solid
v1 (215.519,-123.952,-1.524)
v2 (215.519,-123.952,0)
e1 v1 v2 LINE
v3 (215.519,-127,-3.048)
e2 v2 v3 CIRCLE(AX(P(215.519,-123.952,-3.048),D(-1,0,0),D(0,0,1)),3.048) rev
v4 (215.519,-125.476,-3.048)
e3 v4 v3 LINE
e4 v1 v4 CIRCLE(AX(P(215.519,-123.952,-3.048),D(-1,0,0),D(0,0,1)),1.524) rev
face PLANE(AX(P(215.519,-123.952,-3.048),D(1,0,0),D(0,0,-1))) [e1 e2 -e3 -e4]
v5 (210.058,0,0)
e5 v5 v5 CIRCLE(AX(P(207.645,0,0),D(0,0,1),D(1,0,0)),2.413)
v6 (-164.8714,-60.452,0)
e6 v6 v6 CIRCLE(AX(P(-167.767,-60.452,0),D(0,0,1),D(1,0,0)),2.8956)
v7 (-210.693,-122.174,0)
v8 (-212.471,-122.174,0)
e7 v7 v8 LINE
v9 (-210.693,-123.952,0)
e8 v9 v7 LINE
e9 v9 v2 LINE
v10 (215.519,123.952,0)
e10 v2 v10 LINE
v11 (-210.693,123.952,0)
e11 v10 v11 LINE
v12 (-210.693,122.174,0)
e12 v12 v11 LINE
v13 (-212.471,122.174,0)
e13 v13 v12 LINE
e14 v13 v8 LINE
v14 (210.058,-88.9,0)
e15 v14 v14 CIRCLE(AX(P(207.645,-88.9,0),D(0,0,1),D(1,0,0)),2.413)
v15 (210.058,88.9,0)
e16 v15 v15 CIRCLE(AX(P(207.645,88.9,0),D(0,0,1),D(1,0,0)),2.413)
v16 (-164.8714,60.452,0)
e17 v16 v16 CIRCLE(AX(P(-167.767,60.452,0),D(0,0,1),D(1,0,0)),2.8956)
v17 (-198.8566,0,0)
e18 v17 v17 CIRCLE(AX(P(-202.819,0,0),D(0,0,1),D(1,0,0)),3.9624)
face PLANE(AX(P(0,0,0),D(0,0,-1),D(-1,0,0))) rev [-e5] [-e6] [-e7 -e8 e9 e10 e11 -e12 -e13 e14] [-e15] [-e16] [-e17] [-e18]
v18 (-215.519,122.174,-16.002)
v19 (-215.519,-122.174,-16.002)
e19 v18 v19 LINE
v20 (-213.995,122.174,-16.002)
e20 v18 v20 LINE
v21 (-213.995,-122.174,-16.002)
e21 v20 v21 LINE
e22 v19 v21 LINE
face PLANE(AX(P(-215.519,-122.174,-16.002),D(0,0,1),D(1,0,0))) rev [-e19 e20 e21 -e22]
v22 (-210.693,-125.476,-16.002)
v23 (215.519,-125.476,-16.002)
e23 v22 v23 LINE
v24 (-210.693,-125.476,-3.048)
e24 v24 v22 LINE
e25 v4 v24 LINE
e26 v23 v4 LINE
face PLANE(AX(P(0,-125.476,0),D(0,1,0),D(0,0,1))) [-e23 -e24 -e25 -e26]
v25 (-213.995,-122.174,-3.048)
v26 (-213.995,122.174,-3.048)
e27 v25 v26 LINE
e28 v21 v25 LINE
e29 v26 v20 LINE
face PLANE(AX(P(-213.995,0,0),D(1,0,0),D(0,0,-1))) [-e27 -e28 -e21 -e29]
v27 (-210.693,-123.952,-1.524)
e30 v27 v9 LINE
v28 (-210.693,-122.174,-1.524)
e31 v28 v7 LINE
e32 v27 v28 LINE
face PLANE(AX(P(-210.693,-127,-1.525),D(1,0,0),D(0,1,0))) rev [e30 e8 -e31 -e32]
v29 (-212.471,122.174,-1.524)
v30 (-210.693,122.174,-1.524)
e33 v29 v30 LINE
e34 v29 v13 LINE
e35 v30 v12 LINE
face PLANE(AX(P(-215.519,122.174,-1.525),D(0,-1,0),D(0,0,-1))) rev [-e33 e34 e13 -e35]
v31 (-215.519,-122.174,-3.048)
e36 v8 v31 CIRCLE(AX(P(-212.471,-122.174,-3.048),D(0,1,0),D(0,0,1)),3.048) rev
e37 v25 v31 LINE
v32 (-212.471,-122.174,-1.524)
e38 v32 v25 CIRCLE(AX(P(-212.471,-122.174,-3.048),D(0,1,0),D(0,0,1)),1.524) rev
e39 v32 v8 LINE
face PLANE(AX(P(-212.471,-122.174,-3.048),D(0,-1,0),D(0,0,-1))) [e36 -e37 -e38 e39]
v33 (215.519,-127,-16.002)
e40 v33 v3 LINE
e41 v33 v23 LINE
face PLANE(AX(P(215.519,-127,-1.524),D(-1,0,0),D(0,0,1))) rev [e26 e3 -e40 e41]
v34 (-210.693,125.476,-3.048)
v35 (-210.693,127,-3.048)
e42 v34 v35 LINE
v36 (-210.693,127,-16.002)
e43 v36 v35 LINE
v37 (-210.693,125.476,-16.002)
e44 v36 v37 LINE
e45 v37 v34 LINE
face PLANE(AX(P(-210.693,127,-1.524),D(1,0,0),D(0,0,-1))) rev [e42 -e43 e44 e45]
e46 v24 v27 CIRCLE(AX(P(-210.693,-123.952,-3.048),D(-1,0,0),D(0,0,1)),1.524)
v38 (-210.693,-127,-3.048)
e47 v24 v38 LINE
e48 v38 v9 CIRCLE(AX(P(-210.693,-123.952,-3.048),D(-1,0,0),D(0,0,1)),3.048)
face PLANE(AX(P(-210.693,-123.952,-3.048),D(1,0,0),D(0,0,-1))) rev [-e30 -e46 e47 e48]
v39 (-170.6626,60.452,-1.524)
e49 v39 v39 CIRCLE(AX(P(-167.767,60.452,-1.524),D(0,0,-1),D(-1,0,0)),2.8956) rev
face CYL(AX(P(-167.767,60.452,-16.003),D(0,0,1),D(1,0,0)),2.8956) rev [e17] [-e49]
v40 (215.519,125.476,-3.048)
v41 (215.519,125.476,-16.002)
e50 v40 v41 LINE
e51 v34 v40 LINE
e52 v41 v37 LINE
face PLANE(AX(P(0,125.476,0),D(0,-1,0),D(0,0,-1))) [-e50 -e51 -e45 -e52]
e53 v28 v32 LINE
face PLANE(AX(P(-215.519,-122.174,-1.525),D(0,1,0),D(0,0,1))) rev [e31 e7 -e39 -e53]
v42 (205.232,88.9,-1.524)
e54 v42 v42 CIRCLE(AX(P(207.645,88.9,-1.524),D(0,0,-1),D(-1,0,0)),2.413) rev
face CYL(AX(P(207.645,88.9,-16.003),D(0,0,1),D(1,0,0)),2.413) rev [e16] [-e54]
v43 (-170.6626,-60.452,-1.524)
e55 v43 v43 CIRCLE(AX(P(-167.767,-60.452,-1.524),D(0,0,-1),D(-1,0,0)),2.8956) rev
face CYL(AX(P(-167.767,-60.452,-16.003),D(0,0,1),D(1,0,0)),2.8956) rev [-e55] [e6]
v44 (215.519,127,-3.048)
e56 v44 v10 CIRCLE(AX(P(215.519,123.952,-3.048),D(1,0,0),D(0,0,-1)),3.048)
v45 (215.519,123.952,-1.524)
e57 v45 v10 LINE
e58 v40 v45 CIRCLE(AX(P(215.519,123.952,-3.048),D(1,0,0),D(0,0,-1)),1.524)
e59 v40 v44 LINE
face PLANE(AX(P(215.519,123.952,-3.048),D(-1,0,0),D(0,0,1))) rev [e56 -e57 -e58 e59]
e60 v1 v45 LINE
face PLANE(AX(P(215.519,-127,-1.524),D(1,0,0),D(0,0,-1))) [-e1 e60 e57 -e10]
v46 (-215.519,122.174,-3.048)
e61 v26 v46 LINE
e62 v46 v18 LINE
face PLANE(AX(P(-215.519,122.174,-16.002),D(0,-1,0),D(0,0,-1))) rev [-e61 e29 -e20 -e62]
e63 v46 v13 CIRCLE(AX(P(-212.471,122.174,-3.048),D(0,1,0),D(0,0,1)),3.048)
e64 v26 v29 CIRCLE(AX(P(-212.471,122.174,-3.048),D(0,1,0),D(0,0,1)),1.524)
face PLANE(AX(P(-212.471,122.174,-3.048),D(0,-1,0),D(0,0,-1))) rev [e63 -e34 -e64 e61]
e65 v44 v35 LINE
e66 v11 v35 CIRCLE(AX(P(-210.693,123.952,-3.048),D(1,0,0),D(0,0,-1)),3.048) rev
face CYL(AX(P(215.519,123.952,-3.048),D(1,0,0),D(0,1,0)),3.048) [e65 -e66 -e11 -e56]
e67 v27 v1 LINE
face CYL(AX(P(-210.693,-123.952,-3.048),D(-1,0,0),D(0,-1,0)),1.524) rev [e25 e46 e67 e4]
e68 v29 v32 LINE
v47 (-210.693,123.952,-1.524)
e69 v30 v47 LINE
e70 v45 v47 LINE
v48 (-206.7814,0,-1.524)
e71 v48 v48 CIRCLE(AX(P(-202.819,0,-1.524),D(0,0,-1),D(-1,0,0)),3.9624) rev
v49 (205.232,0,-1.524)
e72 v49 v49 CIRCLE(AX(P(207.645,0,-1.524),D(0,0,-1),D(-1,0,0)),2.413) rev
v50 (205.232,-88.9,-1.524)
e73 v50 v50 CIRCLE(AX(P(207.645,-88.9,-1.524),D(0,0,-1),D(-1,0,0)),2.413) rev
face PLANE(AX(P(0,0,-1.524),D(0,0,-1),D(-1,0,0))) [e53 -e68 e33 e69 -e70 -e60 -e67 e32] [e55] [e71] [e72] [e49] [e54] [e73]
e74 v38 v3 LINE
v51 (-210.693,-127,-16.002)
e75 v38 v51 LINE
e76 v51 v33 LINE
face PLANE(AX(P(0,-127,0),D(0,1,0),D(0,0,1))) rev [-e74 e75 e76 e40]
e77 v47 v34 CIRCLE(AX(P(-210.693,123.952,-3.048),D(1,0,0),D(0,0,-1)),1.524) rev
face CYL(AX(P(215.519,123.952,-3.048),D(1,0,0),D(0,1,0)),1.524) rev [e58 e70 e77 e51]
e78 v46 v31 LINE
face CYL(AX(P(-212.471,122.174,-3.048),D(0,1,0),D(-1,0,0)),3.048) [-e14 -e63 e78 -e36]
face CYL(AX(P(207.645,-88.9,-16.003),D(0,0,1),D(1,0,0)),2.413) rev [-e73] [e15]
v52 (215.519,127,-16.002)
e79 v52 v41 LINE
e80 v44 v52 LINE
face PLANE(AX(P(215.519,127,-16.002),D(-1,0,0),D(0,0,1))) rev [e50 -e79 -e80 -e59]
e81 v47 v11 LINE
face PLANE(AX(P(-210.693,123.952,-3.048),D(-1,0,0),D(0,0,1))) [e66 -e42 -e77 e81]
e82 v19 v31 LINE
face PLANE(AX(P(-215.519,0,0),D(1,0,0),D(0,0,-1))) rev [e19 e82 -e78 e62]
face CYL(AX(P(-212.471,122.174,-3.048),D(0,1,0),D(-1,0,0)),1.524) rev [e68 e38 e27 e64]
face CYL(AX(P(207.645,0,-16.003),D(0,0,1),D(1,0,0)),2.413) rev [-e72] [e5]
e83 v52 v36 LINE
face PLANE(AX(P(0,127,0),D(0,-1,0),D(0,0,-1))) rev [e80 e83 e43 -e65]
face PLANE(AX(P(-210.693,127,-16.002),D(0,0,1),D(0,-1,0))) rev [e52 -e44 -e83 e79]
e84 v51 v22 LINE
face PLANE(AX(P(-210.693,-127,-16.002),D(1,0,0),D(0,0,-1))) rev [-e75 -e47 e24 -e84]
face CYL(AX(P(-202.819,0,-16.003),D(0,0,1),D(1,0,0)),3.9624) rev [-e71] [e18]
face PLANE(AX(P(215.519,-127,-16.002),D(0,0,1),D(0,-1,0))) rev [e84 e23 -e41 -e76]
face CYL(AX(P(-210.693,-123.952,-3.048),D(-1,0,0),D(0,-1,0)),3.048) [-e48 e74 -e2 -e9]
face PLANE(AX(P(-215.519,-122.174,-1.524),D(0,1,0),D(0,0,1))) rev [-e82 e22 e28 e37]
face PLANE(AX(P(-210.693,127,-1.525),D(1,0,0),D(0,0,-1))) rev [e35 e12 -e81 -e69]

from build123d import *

# Parameters (mm, degrees)
CROQUIS1_W                         = 431.038
CROQUIS1_H                         = 254
BRIDA_BASE1_DEPTH                  = 1.524
CORTAR_EXTRUIR1_REACH              = 252.159
CROQUIS6_W                         = 4.826
CROQUIS6_H                         = 4.826
BRIDA_DE_ARISTA1_STRIP_W           = 9.144
BRIDA_DE_ARISTA1_STRIP_H           = 1.524
BRIDA_DE_ARISTA1_STRIP_CUT_DEPTH   = 426.212
BRIDA_DE_ARISTA1_STRIP_2_W         = 9.144
BRIDA_DE_ARISTA1_STRIP_2_H         = 1.524
BRIDA_DE_ARISTA1_STRIP_CUT_2_DEPTH = 426.212
BRIDA_DE_ARISTA1_STRIP_3_W         = 9.144
BRIDA_DE_ARISTA1_STRIP_3_H         = 1.524
BRIDA_DE_ARISTA1_STRIP_CUT_3_DEPTH = 244.348
BRIDA_DE_ARISTA1_DEPTH             = 426.212
BRIDA_DE_ARISTA1_BEND_DEPTH        = 426.212
BRIDA_DE_ARISTA1_BEND_2_DEPTH      = 244.348
CORTAR_EXTRUIR2_REACH              = 252.666
CROQUIS16_R                        = 3.9624
CROQUIS16_R_2                      = 2.8956
CROQUIS16_R_3                      = 2.413


# Sheet-metal steps are written as plain solids
with BuildPart() as part:
    # Croquis1 → Brida base1 (new body)
    with BuildSketch(Plane.XY):
        Rectangle(CROQUIS1_W, CROQUIS1_H)
    extrude(amount=-BRIDA_BASE1_DEPTH)

    # Croquis6 → Cortar-Extruir1 (cut, up to next)
    with BuildSketch(Plane.XY, mode=Mode.PRIVATE) as cortar_extruir1_sk1:
        with Locations((-213.106, 124.587)):
            Rectangle(CROQUIS6_W, CROQUIS6_H)
    cortar_extruir1_tool1 = extrude(cortar_extruir1_sk1.sketch, amount=-CORTAR_EXTRUIR1_REACH, mode=Mode.PRIVATE) & part.part
    # Croquis6 → Cortar-Extruir1 (cut, up to next)
    with BuildSketch(Plane.XY, mode=Mode.PRIVATE) as cortar_extruir1_sk2:
        with Locations((-213.106, -124.587)):
            Rectangle(CROQUIS6_W, CROQUIS6_H)
    cortar_extruir1_tool2 = extrude(cortar_extruir1_sk2.sketch, amount=-CORTAR_EXTRUIR1_REACH, mode=Mode.PRIVATE) & part.part
    add(cortar_extruir1_tool1.solids().sort_by_distance((-213.106, 124.587, 0))[0], mode=Mode.SUBTRACT)
    add(cortar_extruir1_tool2.solids().sort_by_distance((-213.106, -124.587, 0))[0], mode=Mode.SUBTRACT)

    # Brida de arista1 strip (across the edge) → Brida de arista1 strip cut (cut)
    with BuildSketch(Plane(origin=(-210.693, 127, -1.524), x_dir=(0, -1, 0), z_dir=(1, 0, 0))):
        with Locations((-1.524, -0.762)):
            Rectangle(BRIDA_DE_ARISTA1_STRIP_W, BRIDA_DE_ARISTA1_STRIP_H)
    extrude(amount=BRIDA_DE_ARISTA1_STRIP_CUT_DEPTH, mode=Mode.SUBTRACT)

    # Brida de arista1 strip 2 (across the edge) → Brida de arista1 strip cut 2 (cut)
    with BuildSketch(Plane(origin=(215.519, -127, -1.524), x_dir=(0, 1, 0), z_dir=(-1, 0, 0))):
        with Locations((-1.524, -0.762)):
            Rectangle(BRIDA_DE_ARISTA1_STRIP_2_W, BRIDA_DE_ARISTA1_STRIP_2_H)
    extrude(amount=BRIDA_DE_ARISTA1_STRIP_CUT_2_DEPTH, mode=Mode.SUBTRACT)

    # Brida de arista1 strip 3 (across the edge) → Brida de arista1 strip cut 3 (cut)
    with BuildSketch(Plane(origin=(-215.519, -122.174, -1.524), x_dir=(1, 0, 0), z_dir=(0, 1, 0))):
        with Locations((-1.524, -0.762)):
            Rectangle(BRIDA_DE_ARISTA1_STRIP_3_W, BRIDA_DE_ARISTA1_STRIP_3_H)
    extrude(amount=BRIDA_DE_ARISTA1_STRIP_CUT_3_DEPTH, mode=Mode.SUBTRACT)

    # Brida de arista1 section (across the edge) → Brida de arista1 (add)
    with BuildSketch(Plane(origin=(-210.693, 127, -1.524), x_dir=(0, -1, 0), z_dir=(1, 0, 0))):
        with BuildLine():
            Line((0, 1.524), (0, 14.478))
            Line((0, 14.478), (1.524, 14.478))
            Line((1.524, 14.478), (1.524, 1.524))
            ThreePointArc((1.524, 1.524), (1.970369265, 0.446369265), (3.048, 0))
            Line((3.048, 0), (3.048, -1.524))
            ThreePointArc((3.048, -1.524), (0.892738531, -0.631261469), (0, 1.524))
        make_face()
    extrude(amount=BRIDA_DE_ARISTA1_DEPTH)

    # Brida de arista1 section 2 (across the edge) → Brida de arista1 bend (add)
    with BuildSketch(Plane(origin=(215.519, -127, -1.524), x_dir=(0, 1, 0), z_dir=(-1, 0, 0))):
        with BuildLine():
            Line((0, 1.524), (0, 14.478))
            Line((0, 14.478), (1.524, 14.478))
            Line((1.524, 14.478), (1.524, 1.524))
            ThreePointArc((1.524, 1.524), (1.970369265, 0.446369265), (3.048, 0))
            Line((3.048, 0), (3.048, -1.524))
            ThreePointArc((3.048, -1.524), (0.892738531, -0.631261469), (0, 1.524))
        make_face()
    extrude(amount=BRIDA_DE_ARISTA1_BEND_DEPTH)

    # Brida de arista1 section 3 (across the edge) → Brida de arista1 bend 2 (add)
    with BuildSketch(Plane(origin=(-215.519, -122.174, -1.524), x_dir=(1, 0, 0), z_dir=(0, 1, 0))):
        with BuildLine():
            Line((0, 1.524), (0, 14.478))
            Line((0, 14.478), (1.524, 14.478))
            Line((1.524, 14.478), (1.524, 1.524))
            ThreePointArc((1.524, 1.524), (1.970369265, 0.446369265), (3.048, 0))
            Line((3.048, 0), (3.048, -1.524))
            ThreePointArc((3.048, -1.524), (0.892738531, -0.631261469), (0, 1.524))
        make_face()
    extrude(amount=BRIDA_DE_ARISTA1_BEND_2_DEPTH)

    # Croquis16 → Cortar-Extruir2 (cut, up to next)
    with BuildSketch(Plane.XY, mode=Mode.PRIVATE) as cortar_extruir2_sk1:
        with Locations((-202.819, 0)):
            Circle(CROQUIS16_R)
    cortar_extruir2_tool1 = extrude(cortar_extruir2_sk1.sketch, amount=-CORTAR_EXTRUIR2_REACH, mode=Mode.PRIVATE) & part.part
    # Croquis16 → Cortar-Extruir2 (cut, up to next)
    with BuildSketch(Plane.XY, mode=Mode.PRIVATE) as cortar_extruir2_sk2:
        with Locations((-167.767, 60.452)):
            Circle(CROQUIS16_R_2)
    cortar_extruir2_tool2 = extrude(cortar_extruir2_sk2.sketch, amount=-CORTAR_EXTRUIR2_REACH, mode=Mode.PRIVATE) & part.part
    # Croquis16 → Cortar-Extruir2 (cut, up to next)
    with BuildSketch(Plane.XY, mode=Mode.PRIVATE) as cortar_extruir2_sk3:
        with Locations((-167.767, -60.452)):
            Circle(CROQUIS16_R_2)
    cortar_extruir2_tool3 = extrude(cortar_extruir2_sk3.sketch, amount=-CORTAR_EXTRUIR2_REACH, mode=Mode.PRIVATE) & part.part
    # Croquis16 → Cortar-Extruir2 (cut, up to next)
    with BuildSketch(Plane.XY, mode=Mode.PRIVATE) as cortar_extruir2_sk4:
        with Locations((207.645, 88.9)):
            Circle(CROQUIS16_R_3)
    cortar_extruir2_tool4 = extrude(cortar_extruir2_sk4.sketch, amount=-CORTAR_EXTRUIR2_REACH, mode=Mode.PRIVATE) & part.part
    # Croquis16 → Cortar-Extruir2 (cut, up to next)
    with BuildSketch(Plane.XY, mode=Mode.PRIVATE) as cortar_extruir2_sk5:
        with Locations((207.645, 0)):
            Circle(CROQUIS16_R_3)
    cortar_extruir2_tool5 = extrude(cortar_extruir2_sk5.sketch, amount=-CORTAR_EXTRUIR2_REACH, mode=Mode.PRIVATE) & part.part
    # Croquis16 → Cortar-Extruir2 (cut, up to next)
    with BuildSketch(Plane.XY, mode=Mode.PRIVATE) as cortar_extruir2_sk6:
        with Locations((207.645, -88.9)):
            Circle(CROQUIS16_R_3)
    cortar_extruir2_tool6 = extrude(cortar_extruir2_sk6.sketch, amount=-CORTAR_EXTRUIR2_REACH, mode=Mode.PRIVATE) & part.part
    add(cortar_extruir2_tool1.solids().sort_by_distance((-202.819, 0, 0))[0], mode=Mode.SUBTRACT)
    add(cortar_extruir2_tool2.solids().sort_by_distance((-167.767, 60.452, 0))[0], mode=Mode.SUBTRACT)
    add(cortar_extruir2_tool3.solids().sort_by_distance((-167.767, -60.452, 0))[0], mode=Mode.SUBTRACT)
    add(cortar_extruir2_tool4.solids().sort_by_distance((207.645, 88.9, 0))[0], mode=Mode.SUBTRACT)
    add(cortar_extruir2_tool5.solids().sort_by_distance((207.645, 0, 0))[0], mode=Mode.SUBTRACT)
    add(cortar_extruir2_tool6.solids().sort_by_distance((207.645, -88.9, 0))[0], mode=Mode.SUBTRACT)


solid = part.part
